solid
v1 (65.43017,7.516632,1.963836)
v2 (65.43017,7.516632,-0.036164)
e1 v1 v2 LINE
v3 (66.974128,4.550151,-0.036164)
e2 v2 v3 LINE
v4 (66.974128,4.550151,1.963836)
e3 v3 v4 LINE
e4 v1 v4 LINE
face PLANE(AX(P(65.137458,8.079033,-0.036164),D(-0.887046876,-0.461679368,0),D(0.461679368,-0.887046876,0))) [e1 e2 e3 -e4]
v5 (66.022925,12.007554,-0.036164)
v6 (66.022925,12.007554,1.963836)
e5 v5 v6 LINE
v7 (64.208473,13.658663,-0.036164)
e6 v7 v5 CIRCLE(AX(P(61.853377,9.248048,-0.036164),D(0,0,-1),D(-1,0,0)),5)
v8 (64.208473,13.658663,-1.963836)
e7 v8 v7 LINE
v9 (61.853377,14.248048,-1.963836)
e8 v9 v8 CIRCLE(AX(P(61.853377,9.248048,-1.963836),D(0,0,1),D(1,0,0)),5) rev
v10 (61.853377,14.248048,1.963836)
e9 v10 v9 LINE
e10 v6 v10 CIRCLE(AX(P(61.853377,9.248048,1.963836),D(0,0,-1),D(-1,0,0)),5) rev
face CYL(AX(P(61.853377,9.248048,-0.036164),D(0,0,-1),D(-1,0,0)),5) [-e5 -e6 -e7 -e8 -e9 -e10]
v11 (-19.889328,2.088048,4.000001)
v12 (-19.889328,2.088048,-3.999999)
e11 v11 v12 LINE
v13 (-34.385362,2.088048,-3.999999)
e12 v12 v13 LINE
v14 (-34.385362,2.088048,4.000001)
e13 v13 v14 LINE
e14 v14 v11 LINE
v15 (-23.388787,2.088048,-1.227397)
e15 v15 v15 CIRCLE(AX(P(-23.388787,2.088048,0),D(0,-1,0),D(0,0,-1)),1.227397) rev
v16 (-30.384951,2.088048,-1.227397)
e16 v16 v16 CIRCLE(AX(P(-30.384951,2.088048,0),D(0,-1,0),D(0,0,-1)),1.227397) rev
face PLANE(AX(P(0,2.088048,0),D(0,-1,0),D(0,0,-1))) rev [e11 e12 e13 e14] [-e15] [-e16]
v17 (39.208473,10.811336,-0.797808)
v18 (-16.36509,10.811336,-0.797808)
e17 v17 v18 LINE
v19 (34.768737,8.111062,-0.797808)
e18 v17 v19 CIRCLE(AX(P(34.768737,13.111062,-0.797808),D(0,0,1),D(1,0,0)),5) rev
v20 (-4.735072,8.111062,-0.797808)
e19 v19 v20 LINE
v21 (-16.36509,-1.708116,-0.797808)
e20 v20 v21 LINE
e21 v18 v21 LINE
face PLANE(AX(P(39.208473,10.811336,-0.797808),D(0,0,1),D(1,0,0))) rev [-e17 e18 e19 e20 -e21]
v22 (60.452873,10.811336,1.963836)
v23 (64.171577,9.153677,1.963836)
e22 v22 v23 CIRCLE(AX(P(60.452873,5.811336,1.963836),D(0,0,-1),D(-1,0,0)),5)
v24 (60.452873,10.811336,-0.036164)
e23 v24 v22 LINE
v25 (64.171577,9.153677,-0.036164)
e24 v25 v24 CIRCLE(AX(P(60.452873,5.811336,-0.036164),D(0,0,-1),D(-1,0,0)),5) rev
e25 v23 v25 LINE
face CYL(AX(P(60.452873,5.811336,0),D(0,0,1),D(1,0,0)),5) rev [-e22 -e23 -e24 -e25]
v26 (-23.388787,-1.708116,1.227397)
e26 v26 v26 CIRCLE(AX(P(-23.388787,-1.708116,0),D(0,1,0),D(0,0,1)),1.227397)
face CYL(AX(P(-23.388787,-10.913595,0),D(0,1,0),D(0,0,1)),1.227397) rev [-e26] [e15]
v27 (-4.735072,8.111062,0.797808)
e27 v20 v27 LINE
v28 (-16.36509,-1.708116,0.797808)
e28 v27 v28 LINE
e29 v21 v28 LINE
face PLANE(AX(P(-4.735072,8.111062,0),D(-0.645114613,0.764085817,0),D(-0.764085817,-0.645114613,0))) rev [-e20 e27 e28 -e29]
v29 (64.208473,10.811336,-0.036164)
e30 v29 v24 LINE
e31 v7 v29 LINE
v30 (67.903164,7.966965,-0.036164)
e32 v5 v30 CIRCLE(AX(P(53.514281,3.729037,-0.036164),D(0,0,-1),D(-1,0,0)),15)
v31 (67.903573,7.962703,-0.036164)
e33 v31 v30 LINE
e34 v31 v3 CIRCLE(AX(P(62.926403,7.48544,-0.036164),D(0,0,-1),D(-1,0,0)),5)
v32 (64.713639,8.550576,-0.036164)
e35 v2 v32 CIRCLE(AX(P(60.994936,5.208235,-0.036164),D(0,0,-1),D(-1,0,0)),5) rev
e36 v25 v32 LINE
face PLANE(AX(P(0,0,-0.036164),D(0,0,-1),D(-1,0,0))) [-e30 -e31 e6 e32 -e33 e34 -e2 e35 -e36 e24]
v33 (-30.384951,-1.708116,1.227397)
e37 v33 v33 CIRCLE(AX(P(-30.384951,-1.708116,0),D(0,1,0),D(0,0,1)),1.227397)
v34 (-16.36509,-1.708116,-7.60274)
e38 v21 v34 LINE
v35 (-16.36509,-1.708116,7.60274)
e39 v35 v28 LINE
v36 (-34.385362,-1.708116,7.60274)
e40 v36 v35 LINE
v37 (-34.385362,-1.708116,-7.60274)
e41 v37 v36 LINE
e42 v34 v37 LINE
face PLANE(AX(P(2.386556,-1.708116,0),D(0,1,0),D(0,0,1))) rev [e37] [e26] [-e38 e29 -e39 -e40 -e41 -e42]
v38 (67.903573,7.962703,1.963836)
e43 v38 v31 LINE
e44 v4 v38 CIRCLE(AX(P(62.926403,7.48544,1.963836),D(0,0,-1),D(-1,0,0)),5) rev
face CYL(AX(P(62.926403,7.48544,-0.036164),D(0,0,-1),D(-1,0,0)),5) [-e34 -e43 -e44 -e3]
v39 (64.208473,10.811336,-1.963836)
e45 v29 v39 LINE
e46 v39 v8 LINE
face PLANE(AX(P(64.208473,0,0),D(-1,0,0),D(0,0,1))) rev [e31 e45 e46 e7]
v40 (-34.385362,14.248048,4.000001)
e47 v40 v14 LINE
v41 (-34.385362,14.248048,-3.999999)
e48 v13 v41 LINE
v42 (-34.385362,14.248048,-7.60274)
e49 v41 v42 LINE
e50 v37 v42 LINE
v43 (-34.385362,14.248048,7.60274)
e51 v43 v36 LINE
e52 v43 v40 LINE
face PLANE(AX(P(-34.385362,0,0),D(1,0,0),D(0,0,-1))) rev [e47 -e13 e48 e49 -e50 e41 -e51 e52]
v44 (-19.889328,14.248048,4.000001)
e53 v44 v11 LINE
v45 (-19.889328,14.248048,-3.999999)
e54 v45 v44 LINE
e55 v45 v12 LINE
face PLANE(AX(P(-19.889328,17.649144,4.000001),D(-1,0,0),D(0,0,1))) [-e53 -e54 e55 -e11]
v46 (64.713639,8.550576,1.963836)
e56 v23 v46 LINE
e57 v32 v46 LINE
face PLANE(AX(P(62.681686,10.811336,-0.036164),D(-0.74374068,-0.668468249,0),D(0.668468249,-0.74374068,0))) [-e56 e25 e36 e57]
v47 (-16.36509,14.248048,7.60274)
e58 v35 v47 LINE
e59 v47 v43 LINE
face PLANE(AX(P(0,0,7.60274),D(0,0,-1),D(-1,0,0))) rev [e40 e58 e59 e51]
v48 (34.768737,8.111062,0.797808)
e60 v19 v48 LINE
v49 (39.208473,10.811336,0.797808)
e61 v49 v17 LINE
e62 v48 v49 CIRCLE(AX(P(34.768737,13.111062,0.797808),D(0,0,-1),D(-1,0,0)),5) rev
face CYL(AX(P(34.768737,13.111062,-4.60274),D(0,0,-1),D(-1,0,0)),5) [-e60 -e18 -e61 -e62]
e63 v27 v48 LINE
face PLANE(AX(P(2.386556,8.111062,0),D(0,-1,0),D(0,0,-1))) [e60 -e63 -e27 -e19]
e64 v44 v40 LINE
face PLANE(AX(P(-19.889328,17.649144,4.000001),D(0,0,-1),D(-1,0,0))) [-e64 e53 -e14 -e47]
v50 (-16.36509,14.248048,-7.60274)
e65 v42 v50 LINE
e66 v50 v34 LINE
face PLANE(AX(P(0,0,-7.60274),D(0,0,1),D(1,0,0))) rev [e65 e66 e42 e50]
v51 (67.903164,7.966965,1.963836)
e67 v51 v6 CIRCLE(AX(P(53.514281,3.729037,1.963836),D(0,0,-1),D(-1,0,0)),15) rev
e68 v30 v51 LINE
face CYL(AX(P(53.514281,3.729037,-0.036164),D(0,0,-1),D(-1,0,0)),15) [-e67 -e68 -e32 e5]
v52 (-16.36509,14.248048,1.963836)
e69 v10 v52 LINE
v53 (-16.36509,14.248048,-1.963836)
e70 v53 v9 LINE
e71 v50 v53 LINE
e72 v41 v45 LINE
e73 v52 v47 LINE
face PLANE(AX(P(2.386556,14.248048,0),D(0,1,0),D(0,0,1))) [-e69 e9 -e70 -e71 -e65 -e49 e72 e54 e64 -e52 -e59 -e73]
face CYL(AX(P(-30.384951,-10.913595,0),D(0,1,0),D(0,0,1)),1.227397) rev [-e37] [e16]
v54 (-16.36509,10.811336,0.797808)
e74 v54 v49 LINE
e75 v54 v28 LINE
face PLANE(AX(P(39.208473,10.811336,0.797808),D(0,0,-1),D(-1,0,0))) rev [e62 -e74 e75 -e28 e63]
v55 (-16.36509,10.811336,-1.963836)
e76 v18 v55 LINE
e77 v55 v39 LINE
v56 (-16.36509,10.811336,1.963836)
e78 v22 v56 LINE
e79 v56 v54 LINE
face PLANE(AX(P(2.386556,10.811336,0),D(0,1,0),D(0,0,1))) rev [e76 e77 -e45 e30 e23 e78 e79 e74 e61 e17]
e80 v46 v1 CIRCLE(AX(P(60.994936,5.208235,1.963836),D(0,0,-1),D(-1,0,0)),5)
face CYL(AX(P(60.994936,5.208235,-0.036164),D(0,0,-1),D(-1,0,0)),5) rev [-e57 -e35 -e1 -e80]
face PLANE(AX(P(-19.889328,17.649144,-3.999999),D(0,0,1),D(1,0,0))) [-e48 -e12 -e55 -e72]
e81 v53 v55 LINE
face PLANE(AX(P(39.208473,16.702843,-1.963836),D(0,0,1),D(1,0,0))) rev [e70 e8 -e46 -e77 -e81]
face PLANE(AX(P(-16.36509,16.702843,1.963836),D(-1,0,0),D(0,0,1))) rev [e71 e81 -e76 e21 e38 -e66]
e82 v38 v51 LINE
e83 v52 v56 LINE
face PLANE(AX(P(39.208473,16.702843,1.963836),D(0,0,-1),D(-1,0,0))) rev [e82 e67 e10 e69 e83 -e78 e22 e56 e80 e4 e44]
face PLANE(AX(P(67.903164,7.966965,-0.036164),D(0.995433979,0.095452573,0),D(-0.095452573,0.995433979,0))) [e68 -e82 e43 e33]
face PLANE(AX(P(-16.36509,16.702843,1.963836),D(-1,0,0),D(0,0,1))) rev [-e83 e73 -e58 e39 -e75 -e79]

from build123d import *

# Parameters (mm, degrees)
SKETCH1_W            = 60
SKETCH1_H            = 7.5
BOSS_EXTRUDE1_DEPTH  = 13
SKETCH3_W            = 12
SKETCH3_H            = 5
CUT_EXTRUDE1_DEPTH   = 10.5
SKETCH4_R            = 1
CUT_EXTRUDE2_DEPTH   = 10
SKETCH9_W            = 45.277568689
SKETCH9_H            = 2.15
CUT_EXTRUDE8_DEPTH   = 15
SKETCH13_W           = 45.277568689
SKETCH13_H           = 3.2
CUT_EXTRUDE10_DEPTH  = 8
SKETCH14_W           = 45.277568689
SKETCH14_H           = 0.95
CUT_EXTRUDE11_DEPTH  = 2.2
RIB10_REACH          = 34.91
SKETCH16_WALL_W      = 80.220727034
SKETCH16_WALL_H      = 1.3
SKETCH20_W           = 12
SKETCH20_H           = 5
BOSS_EXTRUDE3_DEPTH  = 3
SKETCH22_W           = 12
SKETCH22_H           = 5
CUT_EXTRUDE13_DEPTH  = 1.95
CUT_EXTRUDE14_START  = -10
SKETCH23_R           = 1
CUT_EXTRUDE14_DEPTH  = 10
SCALE1_SCALE         = 1.6
SCALE3_SCALE         = 0.8
SCALE4_SCALE         = 0.95890411
SKETCH34_W           = 14.546034326
SKETCH34_H           = 7.999999695
CUT_EXTRUDE20_DEPTH  = 15
SKETCH39_W           = 3.927671232
SKETCH39_H           = 3.436712329
BOSS_EXTRUDE5_DEPTH  = 25
BOSS_EXTRUDE6_DEPTH  = 2
FILLET1_R            = 15
FILLET3_R            = 5
BOSS_EXTRUDE7_DEPTH  = 2
FILLET4_R            = 5
FILLET5_R            = 5
FILLET6_R            = 5
FILLET7_R            = 5
SKETCH52_W           = 9.205479452
SKETCH52_H           = 15.956164384
CUT_EXTRUDE21_DEPTH  = 0.05
SKETCH54_W           = 0.182732797
SKETCH54_H           = 6.136986302
BOSS_EXTRUDE8_DEPTH  = 15
SKETCH55_W           = 6.136986302
SKETCH55_H           = 3.40109589
CUT_EXTRUDE22_DEPTH  = 15
SKETCH57_W           = 14.496034326
SKETCH57_H           = 7.999999695
CUT_EXTRUDE23_DEPTH  = 12.16
SKETCH58_W           = 18.020271855
SKETCH58_H           = 15.956164384
BOSS_EXTRUDE9_DEPTH  = 3
SKETCH59_W           = 18.020271855
SKETCH59_H           = 15.956164384
BOSS_EXTRUDE10_DEPTH = 3


with BuildPart() as part:
    # Sketch1 → Boss-Extrude1 (new body)
    with BuildSketch(Plane(origin=(0, 0, 0), x_dir=(1, 0, 0), z_dir=(0, 1, 0))):
        Rectangle(SKETCH1_W, SKETCH1_H)
    extrude(amount=BOSS_EXTRUDE1_DEPTH)

    # Sketch3 → Cut-Extrude1 (cut)
    with BuildSketch(Plane(origin=(0, 13, 0), x_dir=(1, 0, 0), z_dir=(0, 1, 0))):
        with Locations((-24, 0)):
            Rectangle(SKETCH3_W, SKETCH3_H)
    extrude(amount=-CUT_EXTRUDE1_DEPTH, mode=Mode.SUBTRACT)

    # Sketch4 → Cut-Extrude2 (cut)
    with BuildSketch(Plane(origin=(0, 2.5, 0), x_dir=(1, 0, 0), z_dir=(0, 1, 0))):
        with Locations(Location((-21, 0, 0), (0, 0, 270))):
            Circle(SKETCH4_R)
        with Locations(Location((-26.7, 0, 0), (0, 0, 270))):
            Circle(SKETCH4_R)
    extrude(amount=-CUT_EXTRUDE2_DEPTH, mode=Mode.SUBTRACT)

    # Sketch9 → Cut-Extrude8 (cut)
    with BuildSketch(Plane.XZ):
        with Locations((7.361215656, 2.675)):
            Rectangle(SKETCH9_W, SKETCH9_H)
        with Locations((7.361215656, -2.675)):
            Rectangle(SKETCH9_W, SKETCH9_H)
    extrude(amount=-CUT_EXTRUDE8_DEPTH, mode=Mode.SUBTRACT)

    # Sketch13 → Cut-Extrude10 (cut)
    with BuildSketch(Plane.XZ):
        with Locations((7.361215656, 0)):
            Rectangle(SKETCH13_W, SKETCH13_H)
    extrude(amount=-CUT_EXTRUDE10_DEPTH, mode=Mode.SUBTRACT)

    # Sketch14 → Cut-Extrude11 (cut)
    with BuildSketch(Plane.XZ.offset(-8)):
        with Locations((7.361215656, 1.125)):
            Rectangle(SKETCH14_W, SKETCH14_H)
        with Locations((7.361215656, -1.125)):
            Rectangle(SKETCH14_W, SKETCH14_H)
    extrude(amount=-CUT_EXTRUDE11_DEPTH, mode=Mode.SUBTRACT)

    # Sketch16 wall → Rib10 (add, up to next)
    with BuildSketch(Plane(origin=(-10.539893857, 4, 0), x_dir=(-0.764085816902, -0.645114613389, 0), z_dir=(0.645114613389, -0.764085816902, 0)), mode=Mode.PRIVATE) as rib10_sk1:
        Rectangle(SKETCH16_WALL_W, SKETCH16_WALL_H)
    rib10_tool1 = extrude(rib10_sk1.sketch, amount=-RIB10_REACH, mode=Mode.PRIVATE) - part.part
    add(rib10_tool1.solids().sort_by_distance((-10.539893857, 4, 0))[0])

    # Sketch20 → Boss-Extrude3 (add)
    with BuildSketch(Plane(origin=(0, 2.5, 0), x_dir=(1, 0, 0), z_dir=(0, 1, 0))):
        with Locations((-24, 0)):
            Rectangle(SKETCH20_W, SKETCH20_H)
    extrude(amount=BOSS_EXTRUDE3_DEPTH)

    # Sketch22 → Cut-Extrude13 (cut)
    with BuildSketch(Plane(origin=(0, 5.5, 0), x_dir=(1, 0, 0), z_dir=(0, 1, 0))):
        with Locations((-24, 0)):
            Rectangle(SKETCH22_W, SKETCH22_H)
    extrude(amount=-CUT_EXTRUDE13_DEPTH, mode=Mode.SUBTRACT)

    # Sketch23 → Cut-Extrude14 (cut)
    with BuildSketch(Plane.XZ.offset(CUT_EXTRUDE14_START)):
        with Locations(Location((-26.7, 0, 0), (0, 0, 90))):
            Circle(SKETCH23_R)
        with Locations(Location((-21, 0, 0), (0, 0, 90))):
            Circle(SKETCH23_R)
    extrude(amount=CUT_EXTRUDE14_DEPTH, mode=Mode.SUBTRACT)


with BuildPart() as part_1:
    # Scale1: scaled about (-10.495093685, 7.511594664, 0)
    add(part.part.scale(SCALE1_SCALE).moved(Location((6.297056211, -4.506956798, 0))))


with BuildPart() as part_2:
    # Scale3: scaled about (-10.495093686, 7.511594664, 0)
    add(part_1.part.scale(SCALE3_SCALE).moved(Location((-2.099018737, 1.502318933, 0))))


with BuildPart() as part_3:
    # Scale4: scaled about (-10.495093686, 7.511594664, 0)
    add(part_2.part.scale(SCALE4_SCALE).moved(Location((-0.43130522, 0.308695671, 0))))

    # Sketch34 → Cut-Extrude20 (cut)
    with BuildSketch(Plane(origin=(0, 2.649144227, 0), x_dir=(1, 0, 0), z_dir=(0, 1, 0))):
        with Locations((-27.162345095, -7.59e-07)):
            Rectangle(SKETCH34_W, SKETCH34_H)
    extrude(amount=CUT_EXTRUDE20_DEPTH, mode=Mode.SUBTRACT)

    # Sketch39 → Boss-Extrude5 (add)
    with BuildSketch(Plane(origin=(39.208473359, 0, 0), x_dir=(0, 0, -1), z_dir=(1, 0, 0))):
        with Locations((0, 12.529692173)):
            Rectangle(SKETCH39_W, SKETCH39_H)
    extrude(amount=BOSS_EXTRUDE5_DEPTH)

    # Sketch45 → Boss-Extrude6 (add)
    with BuildSketch(Plane.XY.offset(1.963835616)):
        Polygon((64.208473359, 14.248048337), (67.197905162, 11.258616533), (67.903164447, 7.966965022), (68.244364149, 4.408739558), (65.703189261, 8.649364426), (64.208473359, 10.811336008), align=None)
    extrude(amount=-BOSS_EXTRUDE6_DEPTH)

    # Fillet1
    # the kernel refuses this fillet: 15 mm, written as the material it takes off along each edge
    with BuildSketch(Plane(origin=(67.197905162, 11.258616533, 12.842753048), x_dir=(-0.7071067811865568, 0.7071067811865384, 0), z_dir=(0, 0, -1))) as fillet1_piece_1:
        with BuildLine():
            CenterArc((4.351566973, -15), FILLET1_R, 90, 28.588827617)
            Line((-2.826242727, -1.828855482), (0, 0))
            Line((0, 0), (4.351566973, 0))
        make_face()
    extrude(amount=23.757834864, mode=Mode.SUBTRACT)

    # Fillet3
    fillet3_edges = [part_3.edges().sort_by_distance(p)[0] for p in [
        (64.207755923, 14.248048337, 0),
    ]]
    fillet(fillet3_edges, radius=FILLET3_R)

    # Sketch47 → Boss-Extrude7 (add)
    with BuildSketch(Plane.XY.offset(1.963835616)):
        Polygon((62.681686065, 10.811336008), (65.137458222, 8.07903323), (66.974128155, 4.550150551), (68.244364149, 4.408739558), (65.703189261, 8.649364426), (64.208473359, 10.811336008), align=None)
    extrude(amount=-BOSS_EXTRUDE7_DEPTH)

    # Fillet4
    fillet4_edges = [part_3.edges().sort_by_distance(p)[0] for p in [
        (62.681686065, 10.811336008, 0.963835616),
    ]]
    fillet(fillet4_edges, radius=FILLET4_R)

    # Fillet5
    fillet5_edges = [part_3.edges().sort_by_distance(p)[0] for p in [
        (65.137458222, 8.07903323, 0.963835616),
    ]]
    fillet(fillet5_edges, radius=FILLET5_R)

    # Fillet6
    # the kernel refuses this fillet: 5 mm, written as the material it takes off along each edge
    with BuildSketch(Plane(origin=(68.244364149, 4.408739558, 10.889498263), x_dir=(-0.993860211442073, 0.11064303011178676, 0), z_dir=(0, 0, -1))) as fillet6_piece_1:
        with BuildLine():
            CenterArc((5.625725169, 2.469414691), FILLET6_R, 168.170246518, 41.425870444)
            Line((0.731919855, 3.494436423), (0.634043748, 3.514936858))
            Line((0.634043748, 3.514936858), (-0.097876106, 0.020500435))
            Line((-0.097876106, 0.020500435), (0, -0.1))
            ThreePointArc((0, -0.1), (0.639041577, -0.1), (1.191130314, -0.049388294))
            Line((1.191130314, -0.049388294), (1.278083154, 0))
        make_face()
    extrude(amount=19.851325293, mode=Mode.SUBTRACT)

    # Fillet7
    # the kernel refuses this fillet: 5 mm, written as the material it takes off along each edge
    with BuildSketch(Plane(origin=(39.208473358, 8.111062035, -11.897149471), x_dir=(1.1344900488242768e-10, 1.0, 0), z_dir=(0, 0, 1))) as fillet7_piece_1:
        with BuildLine():
            CenterArc((4.999999999, 4.439736501), FILLET7_R, 180.000000007, 62.61642823)
            Line((-1e-09, 4.439736501), (-0.100000001, 4.439736501))
            Line((-0.100000001, 4.439736501), (-0.1, 0))
            Line((-0.1, 0), (0, -0.1))
            ThreePointArc((0, -0.1), (1.350136986, -0.1), (2.654279452, -0.08879473))
            Line((2.654279452, -0.08879473), (2.700273973, 0))
        make_face()
    extrude(amount=23.794298942, mode=Mode.SUBTRACT)

    # Sketch52 → Cut-Extrude21 (cut)
    with BuildSketch(Plane.ZY.offset(34.435362258)):
        with Locations((0, 6.269966145)):
            Rectangle(SKETCH52_W, SKETCH52_H)
    extrude(amount=-CUT_EXTRUDE21_DEPTH, mode=Mode.SUBTRACT)

    # Sketch54 → Boss-Extrude8 (add)
    with BuildSketch(Plane(origin=(0, 2.649144227, 0), x_dir=(1, 0, 0), z_dir=(0, 1, 0))):
        with Locations((-19.797961534, 0)):
            Rectangle(SKETCH54_W, SKETCH54_H)
    extrude(amount=BOSS_EXTRUDE8_DEPTH)

    # Sketch55 → Cut-Extrude22 (cut)
    with BuildSketch(Plane(origin=(-19.706595135, 0, 0), x_dir=(0, 0, -1), z_dir=(1, 0, 0))):
        with Locations((0, 15.948596282)):
            Rectangle(SKETCH55_W, SKETCH55_H)
    extrude(amount=-CUT_EXTRUDE22_DEPTH, mode=Mode.SUBTRACT)

    # Sketch57 → Cut-Extrude23 (cut)
    with BuildSketch(Plane(origin=(0, 14.248048337, 0), x_dir=(1, 0, 0), z_dir=(0, 1, 0))):
        with Locations((-27.137345095, -7.59e-07)):
            Rectangle(SKETCH57_W, SKETCH57_H)
    extrude(amount=-CUT_EXTRUDE23_DEPTH, mode=Mode.SUBTRACT)

    # Sketch58 → Boss-Extrude9 (add)
    with BuildSketch(Plane.XY.offset(4.602739726)):
        with Locations((-25.37522633, 6.269966145)):
            Rectangle(SKETCH58_W, SKETCH58_H)
    extrude(amount=BOSS_EXTRUDE9_DEPTH)

    # Sketch59 → Boss-Extrude10 (add)
    with BuildSketch(Plane(origin=(0, 0, -4.602739726), x_dir=(-1, 0, 0), z_dir=(0, 0, -1))):
        with Locations((25.37522633, 6.269966145)):
            Rectangle(SKETCH59_W, SKETCH59_H)
    extrude(amount=BOSS_EXTRUDE10_DEPTH)


solid = part_3.part
